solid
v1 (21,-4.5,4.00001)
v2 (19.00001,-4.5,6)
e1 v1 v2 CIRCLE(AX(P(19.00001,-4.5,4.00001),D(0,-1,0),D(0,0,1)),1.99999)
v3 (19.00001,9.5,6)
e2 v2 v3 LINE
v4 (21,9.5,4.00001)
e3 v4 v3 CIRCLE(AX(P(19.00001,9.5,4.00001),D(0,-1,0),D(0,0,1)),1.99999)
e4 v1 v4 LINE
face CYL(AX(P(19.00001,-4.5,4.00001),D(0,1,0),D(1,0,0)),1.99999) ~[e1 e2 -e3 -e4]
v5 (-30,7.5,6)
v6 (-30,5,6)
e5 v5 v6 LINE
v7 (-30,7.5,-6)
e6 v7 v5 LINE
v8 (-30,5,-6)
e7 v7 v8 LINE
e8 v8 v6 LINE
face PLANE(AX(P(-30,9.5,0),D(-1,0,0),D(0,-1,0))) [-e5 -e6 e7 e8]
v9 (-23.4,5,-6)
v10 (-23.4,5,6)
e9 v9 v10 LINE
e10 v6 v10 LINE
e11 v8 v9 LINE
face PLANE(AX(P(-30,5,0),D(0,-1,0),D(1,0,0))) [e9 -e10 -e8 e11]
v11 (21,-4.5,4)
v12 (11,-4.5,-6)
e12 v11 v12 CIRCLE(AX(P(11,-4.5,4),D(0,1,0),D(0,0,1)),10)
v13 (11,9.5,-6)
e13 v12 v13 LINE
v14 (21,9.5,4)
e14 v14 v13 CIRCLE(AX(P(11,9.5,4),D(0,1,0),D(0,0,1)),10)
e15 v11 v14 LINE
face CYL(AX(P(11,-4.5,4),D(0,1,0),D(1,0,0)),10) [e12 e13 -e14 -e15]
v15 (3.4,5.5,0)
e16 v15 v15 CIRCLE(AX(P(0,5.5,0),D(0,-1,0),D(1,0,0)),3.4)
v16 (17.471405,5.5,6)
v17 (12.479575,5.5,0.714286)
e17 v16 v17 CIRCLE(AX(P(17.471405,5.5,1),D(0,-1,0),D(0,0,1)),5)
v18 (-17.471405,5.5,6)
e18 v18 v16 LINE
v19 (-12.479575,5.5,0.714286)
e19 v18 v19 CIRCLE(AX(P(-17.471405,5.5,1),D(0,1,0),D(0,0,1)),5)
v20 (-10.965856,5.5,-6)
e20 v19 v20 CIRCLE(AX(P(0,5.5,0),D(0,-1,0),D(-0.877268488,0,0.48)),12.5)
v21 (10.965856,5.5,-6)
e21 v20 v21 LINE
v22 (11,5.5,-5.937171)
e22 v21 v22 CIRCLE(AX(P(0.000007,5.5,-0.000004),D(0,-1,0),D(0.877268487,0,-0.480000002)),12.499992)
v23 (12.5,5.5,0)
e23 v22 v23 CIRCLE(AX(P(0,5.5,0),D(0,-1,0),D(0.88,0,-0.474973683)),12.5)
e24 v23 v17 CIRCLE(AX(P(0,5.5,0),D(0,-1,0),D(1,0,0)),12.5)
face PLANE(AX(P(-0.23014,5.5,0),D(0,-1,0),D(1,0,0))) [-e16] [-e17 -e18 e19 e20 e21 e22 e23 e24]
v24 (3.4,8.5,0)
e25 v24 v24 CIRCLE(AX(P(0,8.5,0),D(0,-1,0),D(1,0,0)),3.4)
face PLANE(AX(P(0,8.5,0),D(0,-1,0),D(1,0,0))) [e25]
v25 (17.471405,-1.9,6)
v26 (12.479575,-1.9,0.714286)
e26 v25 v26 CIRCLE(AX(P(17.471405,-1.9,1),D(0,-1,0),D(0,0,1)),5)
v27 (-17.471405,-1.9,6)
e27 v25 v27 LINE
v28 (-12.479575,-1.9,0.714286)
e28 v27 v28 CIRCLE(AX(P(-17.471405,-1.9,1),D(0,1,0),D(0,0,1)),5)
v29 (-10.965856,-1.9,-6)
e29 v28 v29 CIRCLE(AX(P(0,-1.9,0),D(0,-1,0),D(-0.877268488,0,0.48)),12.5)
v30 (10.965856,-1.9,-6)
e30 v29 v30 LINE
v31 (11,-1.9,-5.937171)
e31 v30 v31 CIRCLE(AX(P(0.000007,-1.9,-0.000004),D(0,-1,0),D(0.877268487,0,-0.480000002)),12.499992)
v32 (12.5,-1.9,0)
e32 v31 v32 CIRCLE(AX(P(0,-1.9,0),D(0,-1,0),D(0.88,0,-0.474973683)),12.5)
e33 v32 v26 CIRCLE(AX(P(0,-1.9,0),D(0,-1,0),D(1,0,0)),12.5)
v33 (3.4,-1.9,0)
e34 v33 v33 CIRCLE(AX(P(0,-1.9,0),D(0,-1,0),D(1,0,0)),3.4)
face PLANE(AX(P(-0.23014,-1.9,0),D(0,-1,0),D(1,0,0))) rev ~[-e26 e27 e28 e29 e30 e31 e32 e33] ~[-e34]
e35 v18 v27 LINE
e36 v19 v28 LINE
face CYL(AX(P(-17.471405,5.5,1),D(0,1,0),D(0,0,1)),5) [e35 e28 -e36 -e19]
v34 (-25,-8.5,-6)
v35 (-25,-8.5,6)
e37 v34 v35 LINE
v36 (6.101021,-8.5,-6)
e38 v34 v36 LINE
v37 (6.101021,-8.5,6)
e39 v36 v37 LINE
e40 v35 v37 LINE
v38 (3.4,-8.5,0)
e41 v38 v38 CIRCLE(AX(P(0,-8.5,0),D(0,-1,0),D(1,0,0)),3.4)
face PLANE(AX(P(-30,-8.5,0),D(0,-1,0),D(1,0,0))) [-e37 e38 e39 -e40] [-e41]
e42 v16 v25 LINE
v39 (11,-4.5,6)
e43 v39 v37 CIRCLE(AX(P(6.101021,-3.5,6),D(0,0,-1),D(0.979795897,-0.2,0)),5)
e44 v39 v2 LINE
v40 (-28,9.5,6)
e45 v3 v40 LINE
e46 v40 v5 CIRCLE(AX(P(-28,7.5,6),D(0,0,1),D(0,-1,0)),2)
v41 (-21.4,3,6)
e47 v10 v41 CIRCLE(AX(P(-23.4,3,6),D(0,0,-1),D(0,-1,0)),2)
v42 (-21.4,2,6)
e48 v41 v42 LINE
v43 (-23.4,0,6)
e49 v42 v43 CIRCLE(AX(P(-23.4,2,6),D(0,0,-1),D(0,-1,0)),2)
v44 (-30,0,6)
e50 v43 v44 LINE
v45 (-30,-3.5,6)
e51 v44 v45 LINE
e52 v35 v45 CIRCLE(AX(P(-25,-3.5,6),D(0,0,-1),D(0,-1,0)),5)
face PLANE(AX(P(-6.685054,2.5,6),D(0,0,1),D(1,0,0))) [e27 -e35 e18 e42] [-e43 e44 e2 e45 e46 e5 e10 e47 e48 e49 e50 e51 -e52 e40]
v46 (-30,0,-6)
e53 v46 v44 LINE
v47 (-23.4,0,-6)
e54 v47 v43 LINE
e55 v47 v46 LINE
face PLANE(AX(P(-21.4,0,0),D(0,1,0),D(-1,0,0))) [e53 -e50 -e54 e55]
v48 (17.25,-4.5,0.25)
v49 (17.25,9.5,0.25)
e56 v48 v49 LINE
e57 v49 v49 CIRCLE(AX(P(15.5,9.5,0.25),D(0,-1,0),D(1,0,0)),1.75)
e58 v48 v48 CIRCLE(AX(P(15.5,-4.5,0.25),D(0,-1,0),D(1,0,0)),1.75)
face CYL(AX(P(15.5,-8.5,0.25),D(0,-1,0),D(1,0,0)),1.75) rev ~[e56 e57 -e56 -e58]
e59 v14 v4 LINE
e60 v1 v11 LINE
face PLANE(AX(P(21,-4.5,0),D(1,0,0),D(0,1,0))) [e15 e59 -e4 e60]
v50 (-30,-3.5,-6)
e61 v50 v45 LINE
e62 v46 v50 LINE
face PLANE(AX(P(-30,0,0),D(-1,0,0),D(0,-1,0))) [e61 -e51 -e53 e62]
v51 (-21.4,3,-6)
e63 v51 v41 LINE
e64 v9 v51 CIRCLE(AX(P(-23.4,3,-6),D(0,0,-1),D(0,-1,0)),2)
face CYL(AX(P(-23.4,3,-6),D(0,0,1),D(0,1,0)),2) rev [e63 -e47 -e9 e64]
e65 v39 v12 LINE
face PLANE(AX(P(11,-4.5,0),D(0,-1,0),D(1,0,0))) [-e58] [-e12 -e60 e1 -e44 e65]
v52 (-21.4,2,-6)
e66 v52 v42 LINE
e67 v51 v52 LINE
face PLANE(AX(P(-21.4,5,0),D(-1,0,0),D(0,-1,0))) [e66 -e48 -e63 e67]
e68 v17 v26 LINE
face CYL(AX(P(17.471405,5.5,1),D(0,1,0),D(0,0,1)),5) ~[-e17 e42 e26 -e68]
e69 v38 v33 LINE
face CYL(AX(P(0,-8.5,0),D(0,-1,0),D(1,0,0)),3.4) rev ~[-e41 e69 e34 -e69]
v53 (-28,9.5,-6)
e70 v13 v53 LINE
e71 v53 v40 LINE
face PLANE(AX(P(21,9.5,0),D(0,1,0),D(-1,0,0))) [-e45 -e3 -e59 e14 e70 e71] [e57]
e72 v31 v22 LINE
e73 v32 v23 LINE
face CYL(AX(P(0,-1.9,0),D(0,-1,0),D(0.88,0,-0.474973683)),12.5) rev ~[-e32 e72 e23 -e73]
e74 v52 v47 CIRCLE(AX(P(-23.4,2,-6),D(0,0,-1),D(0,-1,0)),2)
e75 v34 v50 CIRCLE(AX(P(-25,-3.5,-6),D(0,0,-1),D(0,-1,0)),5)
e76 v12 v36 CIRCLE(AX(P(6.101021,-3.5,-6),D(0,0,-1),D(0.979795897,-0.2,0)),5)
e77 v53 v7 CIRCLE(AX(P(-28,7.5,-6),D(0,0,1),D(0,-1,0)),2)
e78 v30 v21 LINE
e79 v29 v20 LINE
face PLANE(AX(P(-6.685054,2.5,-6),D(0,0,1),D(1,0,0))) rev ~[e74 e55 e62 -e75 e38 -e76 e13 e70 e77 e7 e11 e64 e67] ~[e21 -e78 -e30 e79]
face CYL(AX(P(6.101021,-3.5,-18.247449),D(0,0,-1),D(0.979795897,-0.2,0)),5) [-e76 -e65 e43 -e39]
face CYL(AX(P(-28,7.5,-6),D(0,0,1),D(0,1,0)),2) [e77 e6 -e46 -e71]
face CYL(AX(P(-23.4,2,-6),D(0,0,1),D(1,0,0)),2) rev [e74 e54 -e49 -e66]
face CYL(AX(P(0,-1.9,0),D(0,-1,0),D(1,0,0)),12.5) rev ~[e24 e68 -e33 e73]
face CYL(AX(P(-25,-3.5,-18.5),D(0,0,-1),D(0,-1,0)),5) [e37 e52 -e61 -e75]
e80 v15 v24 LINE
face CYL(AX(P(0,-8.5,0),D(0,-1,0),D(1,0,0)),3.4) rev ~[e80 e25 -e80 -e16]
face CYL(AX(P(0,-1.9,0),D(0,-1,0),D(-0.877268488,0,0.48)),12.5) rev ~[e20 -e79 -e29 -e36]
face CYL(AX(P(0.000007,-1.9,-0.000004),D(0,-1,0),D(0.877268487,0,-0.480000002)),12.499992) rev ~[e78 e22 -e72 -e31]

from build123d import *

# Parameters (mm, degrees)
F0_W        = 41
F0_H        = 4
F1_DEPTH    = 6
F3_START    = -6.6
F2_R        = 3.4
F3_DEPTH    = 7.4
F4_T1_DEPTH = 37
F4_T3_DEPTH = 36.4948974279
F4_T5_DEPTH = 7.4
F4_T7_DEPTH = 7.4
F5_DEPTH    = 17
F6_R        = 10
F7_R        = 1.99999
F8_R        = 2
F2_R_2      = 1.75
F9_DEPTH    = 18.001


# Not quite as in the source:
# - a fillet or chamfer that OpenCascade refuses, or shapes differently, is made with other operations: its cross-section is extruded or revolved along the edge and cut away or added
# - a fillet or chamfer is up to 0.001 mm smaller than in the source, because OpenCascade refuses the exact size


with BuildPart() as f1:
    # F0 (on Top) → F1 (new body, symmetric)
    with BuildSketch(Plane.XY):
        Polygon((11, -4.5), (21, -4.5), (21, 9.5), (-30, 9.5), (-30, 5), (-21.4, 5), (-21.4, 0), (-30, 0), (-30, -4.5), align=None)
        with Locations((-9.5, -6.5)):
            Rectangle(F0_W, F0_H)
    extrude(amount=F1_DEPTH, both=True)

    # F2 (on face) → F3 (cut)
    with BuildSketch(Plane.XZ.offset(8.5).offset(F3_START)):
        with BuildLine():
            Line((11, -5.9371710435), (11, 5.9371710435))
            ThreePointArc((11, 5.9371710435), (10.9829729772, 5.9686099372), (10.9658560997, 6))
            Line((10.9658560997, 6), (-10.9658560997, 6))
            ThreePointArc((-10.9658560997, 6), (-12.5, 0), (-10.9658560997, -6))
            Line((-10.9658560997, -6), (10.9658560997, -6))
            ThreePointArc((10.9658560997, -6), (10.9829729772, -5.9686099372), (11, -5.9371710435))
        make_face()
        Circle(F2_R, mode=Mode.SUBTRACT)
        with BuildLine():
            ThreePointArc((11, -5.9371710435), (12.1191996435, -3.0618621785), (12.5, 0))
            ThreePointArc((12.5, 0), (12.1191996435, 3.0618621785), (11, 5.9371710435))
            Line((11, 5.9371710435), (11, -5.9371710435))
        make_face()
        Circle(F2_R)
    extrude(amount=-F3_DEPTH, mode=Mode.SUBTRACT)

    # F4: fillet of radius 5 on 4 edges, made by hand

    # F4_s2 → F4_t1 (cut)
    with BuildSketch(Plane.XY.offset(-18.5)):
        with BuildLine():
            ThreePointArc((-25, -8.5), (-28.5355339059, -7.0355339059), (-30, -3.5))
            Line((-30, -3.5), (-30, -8.5))
            Line((-30, -8.5), (-25, -8.5))
        make_face()
    extrude(amount=F4_T1_DEPTH, mode=Mode.SUBTRACT)

    # F4_s4 → F4_t3 (cut)
    with BuildSketch(Plane.XY.offset(-18.2474487139)):
        with BuildLine():
            ThreePointArc((11, -4.5), (9.2632981746, -7.3729833462), (6.1010205144, -8.5))
            Line((6.1010205144, -8.5), (11, -8.5))
            Line((11, -8.5), (11, -4.5))
        make_face()
    extrude(amount=F4_T3_DEPTH, mode=Mode.SUBTRACT)

    # F4_s6 → F4_t5 (cut)
    with BuildSketch(Plane.XZ.offset(-5.5)):
        with BuildLine():
            ThreePointArc((-17.4714052097, 6), (-13.8362593097, 4.4330328116), (-12.4795751498, 0.7142857143))
            ThreePointArc((-12.4795751498, 0.7142857143), (-12.0169361942, 3.4414015319), (-10.9658560997, 6))
            Line((-10.9658560997, 6), (-17.4714052097, 6))
        make_face()
    extrude(amount=F4_T5_DEPTH, mode=Mode.SUBTRACT)

    # F4_s8 → F4_t7 (cut)
    with BuildSketch(Plane.XZ.offset(-5.5)):
        with BuildLine():
            ThreePointArc((17.4714052097, 6), (13.8362593097, 4.4330328116), (12.4795751498, 0.7142857143))
            ThreePointArc((12.4795751498, 0.7142857143), (12.0169361943, 3.4414015319), (10.9658560997, 6))
            Line((10.9658560997, 6), (17.4714052097, 6))
        make_face()
    extrude(amount=F4_T7_DEPTH, mode=Mode.SUBTRACT)

    # F2 (on face) → F5 (cut, through all)
    with BuildSketch(Plane.XZ.offset(8.5)):
        Circle(F2_R)
    extrude(amount=-F5_DEPTH, mode=Mode.SUBTRACT)

    # F6
    f6_edges = [f1.edges().sort_by_distance(p)[0] for p in [
        (21, 2.5, -6),
    ]]
    fillet(f6_edges, radius=F6_R)

    # F7 (radius 2 in the source; OpenCascade refuses exactly that, so slightly less here)
    f7_edges = [f1.edges().sort_by_distance(p)[0] for p in [
        (21, 2.5, 6),
    ]]
    fillet(f7_edges, radius=F7_R)

    # F8
    f8_edges = [f1.edges().sort_by_distance(p)[0] for p in [
        (-30, 9.5, 0),
        (-21.4, 5, 0),
        (-21.4, 0, 0),
    ]]
    fillet(f8_edges, radius=F8_R)

    # F2 (on face) → F9 (cut, through all)
    with BuildSketch(Plane.XZ.offset(8.5)):
        with Locations((15.5, 0.25)):
            Circle(F2_R_2)
    extrude(amount=-F9_DEPTH, mode=Mode.SUBTRACT)


solid = f1.part
